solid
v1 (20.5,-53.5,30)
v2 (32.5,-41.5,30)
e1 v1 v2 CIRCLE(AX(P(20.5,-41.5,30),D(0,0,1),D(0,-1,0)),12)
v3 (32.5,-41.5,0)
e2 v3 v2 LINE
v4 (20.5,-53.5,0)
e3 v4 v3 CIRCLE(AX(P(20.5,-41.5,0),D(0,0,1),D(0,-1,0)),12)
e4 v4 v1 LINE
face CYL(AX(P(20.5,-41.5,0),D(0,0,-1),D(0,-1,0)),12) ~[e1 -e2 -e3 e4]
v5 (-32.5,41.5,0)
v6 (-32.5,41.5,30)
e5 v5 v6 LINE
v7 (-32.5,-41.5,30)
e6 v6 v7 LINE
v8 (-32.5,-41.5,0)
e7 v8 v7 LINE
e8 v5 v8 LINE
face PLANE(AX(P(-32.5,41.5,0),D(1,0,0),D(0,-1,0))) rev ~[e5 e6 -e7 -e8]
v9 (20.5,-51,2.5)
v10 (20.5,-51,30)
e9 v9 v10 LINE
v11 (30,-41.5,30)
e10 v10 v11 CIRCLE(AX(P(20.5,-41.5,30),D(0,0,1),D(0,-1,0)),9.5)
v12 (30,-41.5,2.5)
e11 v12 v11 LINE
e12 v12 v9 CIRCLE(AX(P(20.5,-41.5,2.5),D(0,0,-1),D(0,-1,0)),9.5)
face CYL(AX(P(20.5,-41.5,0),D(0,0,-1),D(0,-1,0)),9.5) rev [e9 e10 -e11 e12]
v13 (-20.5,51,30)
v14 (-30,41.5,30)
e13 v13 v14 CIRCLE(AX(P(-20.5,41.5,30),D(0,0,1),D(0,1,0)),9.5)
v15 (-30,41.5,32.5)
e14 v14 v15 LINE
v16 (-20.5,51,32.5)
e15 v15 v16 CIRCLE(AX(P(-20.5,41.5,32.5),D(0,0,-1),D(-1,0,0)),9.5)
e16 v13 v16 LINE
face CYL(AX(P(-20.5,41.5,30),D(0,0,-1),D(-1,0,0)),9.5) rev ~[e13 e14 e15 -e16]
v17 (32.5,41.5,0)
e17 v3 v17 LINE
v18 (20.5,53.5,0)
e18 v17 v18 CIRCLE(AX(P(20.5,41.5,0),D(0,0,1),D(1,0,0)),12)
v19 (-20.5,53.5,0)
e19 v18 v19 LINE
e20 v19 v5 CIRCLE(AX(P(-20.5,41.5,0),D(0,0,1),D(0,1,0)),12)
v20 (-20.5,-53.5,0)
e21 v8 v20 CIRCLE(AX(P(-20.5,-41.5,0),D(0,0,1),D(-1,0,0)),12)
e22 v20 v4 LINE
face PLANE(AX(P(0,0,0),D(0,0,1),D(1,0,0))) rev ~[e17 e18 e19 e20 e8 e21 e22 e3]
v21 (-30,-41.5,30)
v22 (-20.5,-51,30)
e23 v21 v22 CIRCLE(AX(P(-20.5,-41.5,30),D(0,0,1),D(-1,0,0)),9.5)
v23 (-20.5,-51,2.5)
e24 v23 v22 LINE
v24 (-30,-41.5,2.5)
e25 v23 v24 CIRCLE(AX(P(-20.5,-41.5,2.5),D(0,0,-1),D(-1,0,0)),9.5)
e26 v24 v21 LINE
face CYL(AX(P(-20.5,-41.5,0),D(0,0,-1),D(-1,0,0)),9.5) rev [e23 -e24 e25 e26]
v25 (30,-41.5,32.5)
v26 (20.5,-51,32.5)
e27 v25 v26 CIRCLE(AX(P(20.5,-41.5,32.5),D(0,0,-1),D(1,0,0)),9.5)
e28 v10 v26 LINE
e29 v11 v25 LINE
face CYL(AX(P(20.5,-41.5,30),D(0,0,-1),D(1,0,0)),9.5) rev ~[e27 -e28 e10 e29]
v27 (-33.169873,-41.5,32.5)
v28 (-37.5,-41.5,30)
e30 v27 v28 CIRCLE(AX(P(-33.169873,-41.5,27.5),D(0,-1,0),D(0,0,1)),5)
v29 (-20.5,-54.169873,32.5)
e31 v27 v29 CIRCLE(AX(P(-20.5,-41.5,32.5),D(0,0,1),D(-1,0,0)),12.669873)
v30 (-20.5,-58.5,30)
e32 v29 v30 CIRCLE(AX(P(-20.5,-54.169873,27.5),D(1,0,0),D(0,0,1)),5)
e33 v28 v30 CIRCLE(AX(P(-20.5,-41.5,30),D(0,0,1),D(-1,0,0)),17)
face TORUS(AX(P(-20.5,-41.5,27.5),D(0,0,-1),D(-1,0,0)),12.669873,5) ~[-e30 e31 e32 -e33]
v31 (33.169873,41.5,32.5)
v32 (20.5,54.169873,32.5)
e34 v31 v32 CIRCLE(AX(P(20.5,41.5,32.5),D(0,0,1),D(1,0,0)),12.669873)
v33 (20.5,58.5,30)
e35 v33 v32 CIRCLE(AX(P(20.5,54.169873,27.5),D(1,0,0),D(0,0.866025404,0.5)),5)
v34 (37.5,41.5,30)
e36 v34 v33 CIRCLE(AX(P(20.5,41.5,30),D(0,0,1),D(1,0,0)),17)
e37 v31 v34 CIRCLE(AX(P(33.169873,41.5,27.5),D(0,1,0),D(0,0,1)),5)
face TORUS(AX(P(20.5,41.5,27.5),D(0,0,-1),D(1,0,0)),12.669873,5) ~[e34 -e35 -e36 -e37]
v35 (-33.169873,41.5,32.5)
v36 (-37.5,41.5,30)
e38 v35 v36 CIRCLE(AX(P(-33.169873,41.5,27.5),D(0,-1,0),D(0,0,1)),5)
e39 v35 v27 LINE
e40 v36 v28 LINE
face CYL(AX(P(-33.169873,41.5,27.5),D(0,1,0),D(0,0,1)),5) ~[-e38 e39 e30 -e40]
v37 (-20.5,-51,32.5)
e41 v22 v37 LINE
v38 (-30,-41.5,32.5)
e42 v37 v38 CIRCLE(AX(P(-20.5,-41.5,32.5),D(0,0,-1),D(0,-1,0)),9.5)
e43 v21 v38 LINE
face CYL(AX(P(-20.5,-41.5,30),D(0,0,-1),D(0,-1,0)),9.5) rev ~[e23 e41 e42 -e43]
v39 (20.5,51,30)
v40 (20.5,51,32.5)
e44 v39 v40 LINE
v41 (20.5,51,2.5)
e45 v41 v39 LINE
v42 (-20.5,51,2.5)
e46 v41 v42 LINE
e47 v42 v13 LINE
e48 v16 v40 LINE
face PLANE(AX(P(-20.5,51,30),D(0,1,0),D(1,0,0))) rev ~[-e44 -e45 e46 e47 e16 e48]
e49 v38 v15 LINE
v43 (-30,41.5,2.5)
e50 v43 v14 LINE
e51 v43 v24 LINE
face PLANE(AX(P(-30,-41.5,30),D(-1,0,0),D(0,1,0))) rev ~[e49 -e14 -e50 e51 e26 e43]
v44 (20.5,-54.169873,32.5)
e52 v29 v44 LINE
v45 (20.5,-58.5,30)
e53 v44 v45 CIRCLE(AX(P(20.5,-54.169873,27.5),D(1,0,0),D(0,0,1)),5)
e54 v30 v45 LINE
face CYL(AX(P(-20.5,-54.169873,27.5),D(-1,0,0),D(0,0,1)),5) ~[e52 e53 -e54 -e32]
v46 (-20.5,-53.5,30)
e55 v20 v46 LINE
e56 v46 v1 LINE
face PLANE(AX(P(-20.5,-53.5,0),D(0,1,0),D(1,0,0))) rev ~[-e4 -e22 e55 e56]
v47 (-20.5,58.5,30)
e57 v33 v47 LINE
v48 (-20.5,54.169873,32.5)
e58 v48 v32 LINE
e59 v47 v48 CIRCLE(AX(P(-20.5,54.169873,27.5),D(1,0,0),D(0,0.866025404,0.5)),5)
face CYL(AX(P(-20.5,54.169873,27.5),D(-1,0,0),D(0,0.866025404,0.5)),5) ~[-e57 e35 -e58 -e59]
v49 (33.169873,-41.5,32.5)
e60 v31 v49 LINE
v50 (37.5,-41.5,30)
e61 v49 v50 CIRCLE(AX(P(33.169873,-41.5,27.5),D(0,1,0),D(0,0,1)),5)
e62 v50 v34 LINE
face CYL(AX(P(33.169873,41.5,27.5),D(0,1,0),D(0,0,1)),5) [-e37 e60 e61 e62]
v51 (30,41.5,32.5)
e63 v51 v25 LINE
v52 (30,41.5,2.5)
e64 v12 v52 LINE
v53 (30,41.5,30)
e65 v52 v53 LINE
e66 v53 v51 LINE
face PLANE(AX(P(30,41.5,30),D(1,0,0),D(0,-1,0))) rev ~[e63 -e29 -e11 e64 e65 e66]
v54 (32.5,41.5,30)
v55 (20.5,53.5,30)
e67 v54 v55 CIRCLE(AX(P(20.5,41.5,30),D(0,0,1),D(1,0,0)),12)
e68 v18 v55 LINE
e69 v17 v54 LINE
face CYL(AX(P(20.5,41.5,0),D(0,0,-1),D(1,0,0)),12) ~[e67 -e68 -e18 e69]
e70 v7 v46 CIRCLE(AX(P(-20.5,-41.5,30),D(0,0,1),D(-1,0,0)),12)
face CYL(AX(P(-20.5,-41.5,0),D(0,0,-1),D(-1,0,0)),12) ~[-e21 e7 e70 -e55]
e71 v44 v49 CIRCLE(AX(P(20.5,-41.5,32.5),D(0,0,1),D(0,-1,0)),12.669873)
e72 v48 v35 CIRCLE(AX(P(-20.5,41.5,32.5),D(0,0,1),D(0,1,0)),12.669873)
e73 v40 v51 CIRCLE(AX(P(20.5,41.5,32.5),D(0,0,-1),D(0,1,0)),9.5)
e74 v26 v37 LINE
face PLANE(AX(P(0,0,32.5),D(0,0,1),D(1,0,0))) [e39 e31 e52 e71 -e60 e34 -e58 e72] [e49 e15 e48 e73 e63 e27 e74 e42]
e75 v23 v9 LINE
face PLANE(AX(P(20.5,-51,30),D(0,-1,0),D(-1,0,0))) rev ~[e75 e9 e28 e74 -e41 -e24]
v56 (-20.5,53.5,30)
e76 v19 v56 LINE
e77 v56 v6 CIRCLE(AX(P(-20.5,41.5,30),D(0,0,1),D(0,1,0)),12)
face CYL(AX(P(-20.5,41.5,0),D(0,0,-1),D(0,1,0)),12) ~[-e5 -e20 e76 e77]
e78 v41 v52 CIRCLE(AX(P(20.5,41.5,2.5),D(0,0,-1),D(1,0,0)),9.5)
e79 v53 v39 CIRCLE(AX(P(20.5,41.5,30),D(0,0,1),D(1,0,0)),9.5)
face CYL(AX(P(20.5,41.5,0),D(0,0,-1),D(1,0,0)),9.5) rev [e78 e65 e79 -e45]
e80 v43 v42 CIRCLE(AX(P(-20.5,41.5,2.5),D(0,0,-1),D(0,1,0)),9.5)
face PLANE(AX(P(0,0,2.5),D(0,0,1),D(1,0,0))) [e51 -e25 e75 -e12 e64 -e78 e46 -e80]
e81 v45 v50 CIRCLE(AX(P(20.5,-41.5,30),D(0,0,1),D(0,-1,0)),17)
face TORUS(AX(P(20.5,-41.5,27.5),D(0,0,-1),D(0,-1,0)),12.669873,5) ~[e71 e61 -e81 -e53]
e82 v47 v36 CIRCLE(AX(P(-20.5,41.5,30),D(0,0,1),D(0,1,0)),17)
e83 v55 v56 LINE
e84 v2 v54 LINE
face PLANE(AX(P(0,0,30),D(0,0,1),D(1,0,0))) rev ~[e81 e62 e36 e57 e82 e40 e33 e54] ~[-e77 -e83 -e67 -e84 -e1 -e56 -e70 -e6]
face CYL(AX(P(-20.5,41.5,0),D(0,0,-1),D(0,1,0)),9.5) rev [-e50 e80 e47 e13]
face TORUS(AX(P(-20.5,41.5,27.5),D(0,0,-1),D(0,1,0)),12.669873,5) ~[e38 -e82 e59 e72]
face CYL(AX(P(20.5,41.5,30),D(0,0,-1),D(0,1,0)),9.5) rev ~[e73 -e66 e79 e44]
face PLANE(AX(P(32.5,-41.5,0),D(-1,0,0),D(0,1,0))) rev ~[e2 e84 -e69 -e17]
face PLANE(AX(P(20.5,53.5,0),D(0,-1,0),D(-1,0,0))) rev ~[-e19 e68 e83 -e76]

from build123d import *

# Parameters (mm, degrees)
F1_DEPTH     = 30
F2_T         = -2.5
F4_DEPTH     = 2.5
F5_T1_DEPTH  = 83
F5_T3_DEPTH  = 41
F5_T6_ANGLE  = 90
F5_T8_ANGLE  = 90
F5_T10_ANGLE = 90
F5_T12_ANGLE = 90


# Not quite as in the source:
# - a fillet or chamfer that OpenCascade refuses, or shapes differently, is made with other operations: its cross-section is extruded or revolved along the edge and cut away or added


with BuildPart() as f1:
    # F0 (on Top) → F1 (new body)
    with BuildSketch(Plane.XY):
        with BuildLine():
            ThreePointArc((32.5, 41.5), (28.9852813742, 49.9852813742), (20.5, 53.5))
            Line((20.5, 53.5), (-20.5, 53.5))
            ThreePointArc((-20.5, 53.5), (-28.9852813742, 49.9852813742), (-32.5, 41.5))
            Line((-32.5, 41.5), (-32.5, -41.5))
            ThreePointArc((-32.5, -41.5), (-28.9852813742, -49.9852813742), (-20.5, -53.5))
            Line((-20.5, -53.5), (20.5, -53.5))
            ThreePointArc((20.5, -53.5), (28.9852813742, -49.9852813742), (32.5, -41.5))
            Line((32.5, -41.5), (32.5, 41.5))
        make_face()
    extrude(amount=F1_DEPTH)

    # F2
    f2_openings = [f1.faces().sort_by_distance(p)[0] for p in [
        (0, 0, 30),
    ]]
    offset(amount=F2_T, openings=f2_openings)

    # F3 (on face) → F4 (join)
    with BuildSketch(Plane.XY.offset(30)):
        with BuildLine():
            Line((-20.5, -58.5), (20.5, -58.5))
            ThreePointArc((20.5, -58.5), (32.5208152802, -53.5208152802), (37.5, -41.5))
            Line((37.5, -41.5), (37.5, 41.5))
            ThreePointArc((37.5, 41.5), (32.5208152802, 53.5208152802), (20.5, 58.5))
            Line((20.5, 58.5), (-20.5, 58.5))
            ThreePointArc((-20.5, 58.5), (-32.5208152802, 53.5208152802), (-37.5, 41.5))
            Line((-37.5, 41.5), (-37.5, -41.5))
            ThreePointArc((-37.5, -41.5), (-32.5208152802, -53.5208152802), (-20.5, -58.5))
        make_face()
        with BuildLine():
            ThreePointArc((20.5, 53.5), (28.9852813742, 49.9852813742), (32.5, 41.5))
            Line((32.5, 41.5), (32.5, -41.5))
            ThreePointArc((32.5, -41.5), (28.9852813742, -49.9852813742), (20.5, -53.5))
            Line((20.5, -53.5), (-20.5, -53.5))
            ThreePointArc((-20.5, -53.5), (-28.9852813742, -49.9852813742), (-32.5, -41.5))
            Line((-32.5, -41.5), (-32.5, 41.5))
            ThreePointArc((-32.5, 41.5), (-28.9852813742, 49.9852813742), (-20.5, 53.5))
            Line((-20.5, 53.5), (20.5, 53.5))
        make_face(mode=Mode.SUBTRACT)
        with BuildLine():
            Line((32.5, -41.5), (32.5, 41.5))
            ThreePointArc((32.5, 41.5), (28.9852813742, 49.9852813742), (20.5, 53.5))
            Line((20.5, 53.5), (-20.5, 53.5))
            ThreePointArc((-20.5, 53.5), (-28.9852813742, 49.9852813742), (-32.5, 41.5))
            Line((-32.5, 41.5), (-32.5, -41.5))
            ThreePointArc((-32.5, -41.5), (-28.9852813742, -49.9852813742), (-20.5, -53.5))
            Line((-20.5, -53.5), (20.5, -53.5))
            ThreePointArc((20.5, -53.5), (28.9852813742, -49.9852813742), (32.5, -41.5))
        make_face()
        with BuildLine():
            Line((-20.5, 51), (20.5, 51))
            ThreePointArc((20.5, 51), (27.2175144213, 48.2175144213), (30, 41.5))
            Line((30, 41.5), (30, -41.5))
            ThreePointArc((30, -41.5), (27.2175144213, -48.2175144213), (20.5, -51))
            Line((20.5, -51), (-20.5, -51))
            ThreePointArc((-20.5, -51), (-27.2175144213, -48.2175144213), (-30, -41.5))
            Line((-30, -41.5), (-30, 41.5))
            ThreePointArc((-30, 41.5), (-27.2175144213, 48.2175144213), (-20.5, 51))
        make_face(mode=Mode.SUBTRACT)
    extrude(amount=F4_DEPTH)

    # F5: fillet of radius 5 on 1 edges, made by hand

    # F5_s2 → F5_t1 (cut)
    with BuildSketch(Plane.XZ.offset(-41.5)):
        with BuildLine():
            ThreePointArc((33.1698729811, 32.5), (35.6698729811, 31.8301270189), (37.5, 30))
            Line((37.5, 30), (37.5, 32.5))
            Line((37.5, 32.5), (33.1698729811, 32.5))
        make_face()
        with BuildLine():
            ThreePointArc((-33.1698729811, 32.5), (-35.6698729811, 31.8301270189), (-37.5, 30))
            Line((-37.5, 30), (-37.5, 32.5))
            Line((-37.5, 32.5), (-33.1698729811, 32.5))
        make_face()
    extrude(amount=F5_T1_DEPTH, mode=Mode.SUBTRACT)

    # F5_s4 → F5_t3 (cut)
    with BuildSketch(Plane.YZ.offset(-20.5)):
        with BuildLine():
            ThreePointArc((58.5, 30), (56.6698729811, 31.8301270189), (54.1698729811, 32.5))
            Line((54.1698729811, 32.5), (58.5, 32.5))
            Line((58.5, 32.5), (58.5, 30))
        make_face()
        with BuildLine():
            ThreePointArc((-54.1698729811, 32.5), (-56.6698729811, 31.8301270189), (-58.5, 30))
            Line((-58.5, 30), (-58.5, 32.5))
            Line((-58.5, 32.5), (-54.1698729811, 32.5))
        make_face()
    extrude(amount=F5_T3_DEPTH, mode=Mode.SUBTRACT)

    # F5_s5 → F5_t6 (revolve, cut)
    with BuildSketch(Plane.YZ.offset(20.5)):
        with BuildLine():
            ThreePointArc((-54.1698729811, 32.5), (-56.6698729811, 31.8301270189), (-58.5, 30))
            Line((-58.5, 30), (-58.5, 32.5))
            Line((-58.5, 32.5), (-54.1698729811, 32.5))
        make_face()
    revolve(axis=Axis((20.5, -41.5, 32.5), (0, 0, 1)), revolution_arc=F5_T6_ANGLE, mode=Mode.SUBTRACT)

    # F5_s7 → F5_t8 (revolve, cut)
    with BuildSketch(Plane.XZ.offset(-41.5)):
        with BuildLine():
            ThreePointArc((33.1698729811, 32.5), (35.6698729811, 31.8301270189), (37.5, 30))
            Line((37.5, 30), (37.5, 32.5))
            Line((37.5, 32.5), (33.1698729811, 32.5))
        make_face()
    revolve(axis=Axis((20.5, 41.5, 32.5), (0, 0, 1)), revolution_arc=F5_T8_ANGLE, mode=Mode.SUBTRACT)

    # F5_s9 → F5_t10 (revolve, cut)
    with BuildSketch(Plane.YZ.offset(-20.5)):
        with BuildLine():
            ThreePointArc((54.1698729811, 32.5), (56.6698729811, 31.8301270189), (58.5, 30))
            Line((58.5, 30), (58.5, 32.5))
            Line((58.5, 32.5), (54.1698729811, 32.5))
        make_face()
    revolve(axis=Axis((-20.5, 41.5, 32.5), (0, 0, 1)), revolution_arc=F5_T10_ANGLE, mode=Mode.SUBTRACT)

    # F5_s11 → F5_t12 (revolve, cut)
    with BuildSketch(Plane.XZ.offset(41.5)):
        with BuildLine():
            ThreePointArc((-33.1698729811, 32.5), (-35.6698729811, 31.8301270189), (-37.5, 30))
            Line((-37.5, 30), (-37.5, 32.5))
            Line((-37.5, 32.5), (-33.1698729811, 32.5))
        make_face()
    revolve(axis=Axis((-20.5, -41.5, 32.5), (0, 0, 1)), revolution_arc=F5_T12_ANGLE, mode=Mode.SUBTRACT)


solid = f1.part
